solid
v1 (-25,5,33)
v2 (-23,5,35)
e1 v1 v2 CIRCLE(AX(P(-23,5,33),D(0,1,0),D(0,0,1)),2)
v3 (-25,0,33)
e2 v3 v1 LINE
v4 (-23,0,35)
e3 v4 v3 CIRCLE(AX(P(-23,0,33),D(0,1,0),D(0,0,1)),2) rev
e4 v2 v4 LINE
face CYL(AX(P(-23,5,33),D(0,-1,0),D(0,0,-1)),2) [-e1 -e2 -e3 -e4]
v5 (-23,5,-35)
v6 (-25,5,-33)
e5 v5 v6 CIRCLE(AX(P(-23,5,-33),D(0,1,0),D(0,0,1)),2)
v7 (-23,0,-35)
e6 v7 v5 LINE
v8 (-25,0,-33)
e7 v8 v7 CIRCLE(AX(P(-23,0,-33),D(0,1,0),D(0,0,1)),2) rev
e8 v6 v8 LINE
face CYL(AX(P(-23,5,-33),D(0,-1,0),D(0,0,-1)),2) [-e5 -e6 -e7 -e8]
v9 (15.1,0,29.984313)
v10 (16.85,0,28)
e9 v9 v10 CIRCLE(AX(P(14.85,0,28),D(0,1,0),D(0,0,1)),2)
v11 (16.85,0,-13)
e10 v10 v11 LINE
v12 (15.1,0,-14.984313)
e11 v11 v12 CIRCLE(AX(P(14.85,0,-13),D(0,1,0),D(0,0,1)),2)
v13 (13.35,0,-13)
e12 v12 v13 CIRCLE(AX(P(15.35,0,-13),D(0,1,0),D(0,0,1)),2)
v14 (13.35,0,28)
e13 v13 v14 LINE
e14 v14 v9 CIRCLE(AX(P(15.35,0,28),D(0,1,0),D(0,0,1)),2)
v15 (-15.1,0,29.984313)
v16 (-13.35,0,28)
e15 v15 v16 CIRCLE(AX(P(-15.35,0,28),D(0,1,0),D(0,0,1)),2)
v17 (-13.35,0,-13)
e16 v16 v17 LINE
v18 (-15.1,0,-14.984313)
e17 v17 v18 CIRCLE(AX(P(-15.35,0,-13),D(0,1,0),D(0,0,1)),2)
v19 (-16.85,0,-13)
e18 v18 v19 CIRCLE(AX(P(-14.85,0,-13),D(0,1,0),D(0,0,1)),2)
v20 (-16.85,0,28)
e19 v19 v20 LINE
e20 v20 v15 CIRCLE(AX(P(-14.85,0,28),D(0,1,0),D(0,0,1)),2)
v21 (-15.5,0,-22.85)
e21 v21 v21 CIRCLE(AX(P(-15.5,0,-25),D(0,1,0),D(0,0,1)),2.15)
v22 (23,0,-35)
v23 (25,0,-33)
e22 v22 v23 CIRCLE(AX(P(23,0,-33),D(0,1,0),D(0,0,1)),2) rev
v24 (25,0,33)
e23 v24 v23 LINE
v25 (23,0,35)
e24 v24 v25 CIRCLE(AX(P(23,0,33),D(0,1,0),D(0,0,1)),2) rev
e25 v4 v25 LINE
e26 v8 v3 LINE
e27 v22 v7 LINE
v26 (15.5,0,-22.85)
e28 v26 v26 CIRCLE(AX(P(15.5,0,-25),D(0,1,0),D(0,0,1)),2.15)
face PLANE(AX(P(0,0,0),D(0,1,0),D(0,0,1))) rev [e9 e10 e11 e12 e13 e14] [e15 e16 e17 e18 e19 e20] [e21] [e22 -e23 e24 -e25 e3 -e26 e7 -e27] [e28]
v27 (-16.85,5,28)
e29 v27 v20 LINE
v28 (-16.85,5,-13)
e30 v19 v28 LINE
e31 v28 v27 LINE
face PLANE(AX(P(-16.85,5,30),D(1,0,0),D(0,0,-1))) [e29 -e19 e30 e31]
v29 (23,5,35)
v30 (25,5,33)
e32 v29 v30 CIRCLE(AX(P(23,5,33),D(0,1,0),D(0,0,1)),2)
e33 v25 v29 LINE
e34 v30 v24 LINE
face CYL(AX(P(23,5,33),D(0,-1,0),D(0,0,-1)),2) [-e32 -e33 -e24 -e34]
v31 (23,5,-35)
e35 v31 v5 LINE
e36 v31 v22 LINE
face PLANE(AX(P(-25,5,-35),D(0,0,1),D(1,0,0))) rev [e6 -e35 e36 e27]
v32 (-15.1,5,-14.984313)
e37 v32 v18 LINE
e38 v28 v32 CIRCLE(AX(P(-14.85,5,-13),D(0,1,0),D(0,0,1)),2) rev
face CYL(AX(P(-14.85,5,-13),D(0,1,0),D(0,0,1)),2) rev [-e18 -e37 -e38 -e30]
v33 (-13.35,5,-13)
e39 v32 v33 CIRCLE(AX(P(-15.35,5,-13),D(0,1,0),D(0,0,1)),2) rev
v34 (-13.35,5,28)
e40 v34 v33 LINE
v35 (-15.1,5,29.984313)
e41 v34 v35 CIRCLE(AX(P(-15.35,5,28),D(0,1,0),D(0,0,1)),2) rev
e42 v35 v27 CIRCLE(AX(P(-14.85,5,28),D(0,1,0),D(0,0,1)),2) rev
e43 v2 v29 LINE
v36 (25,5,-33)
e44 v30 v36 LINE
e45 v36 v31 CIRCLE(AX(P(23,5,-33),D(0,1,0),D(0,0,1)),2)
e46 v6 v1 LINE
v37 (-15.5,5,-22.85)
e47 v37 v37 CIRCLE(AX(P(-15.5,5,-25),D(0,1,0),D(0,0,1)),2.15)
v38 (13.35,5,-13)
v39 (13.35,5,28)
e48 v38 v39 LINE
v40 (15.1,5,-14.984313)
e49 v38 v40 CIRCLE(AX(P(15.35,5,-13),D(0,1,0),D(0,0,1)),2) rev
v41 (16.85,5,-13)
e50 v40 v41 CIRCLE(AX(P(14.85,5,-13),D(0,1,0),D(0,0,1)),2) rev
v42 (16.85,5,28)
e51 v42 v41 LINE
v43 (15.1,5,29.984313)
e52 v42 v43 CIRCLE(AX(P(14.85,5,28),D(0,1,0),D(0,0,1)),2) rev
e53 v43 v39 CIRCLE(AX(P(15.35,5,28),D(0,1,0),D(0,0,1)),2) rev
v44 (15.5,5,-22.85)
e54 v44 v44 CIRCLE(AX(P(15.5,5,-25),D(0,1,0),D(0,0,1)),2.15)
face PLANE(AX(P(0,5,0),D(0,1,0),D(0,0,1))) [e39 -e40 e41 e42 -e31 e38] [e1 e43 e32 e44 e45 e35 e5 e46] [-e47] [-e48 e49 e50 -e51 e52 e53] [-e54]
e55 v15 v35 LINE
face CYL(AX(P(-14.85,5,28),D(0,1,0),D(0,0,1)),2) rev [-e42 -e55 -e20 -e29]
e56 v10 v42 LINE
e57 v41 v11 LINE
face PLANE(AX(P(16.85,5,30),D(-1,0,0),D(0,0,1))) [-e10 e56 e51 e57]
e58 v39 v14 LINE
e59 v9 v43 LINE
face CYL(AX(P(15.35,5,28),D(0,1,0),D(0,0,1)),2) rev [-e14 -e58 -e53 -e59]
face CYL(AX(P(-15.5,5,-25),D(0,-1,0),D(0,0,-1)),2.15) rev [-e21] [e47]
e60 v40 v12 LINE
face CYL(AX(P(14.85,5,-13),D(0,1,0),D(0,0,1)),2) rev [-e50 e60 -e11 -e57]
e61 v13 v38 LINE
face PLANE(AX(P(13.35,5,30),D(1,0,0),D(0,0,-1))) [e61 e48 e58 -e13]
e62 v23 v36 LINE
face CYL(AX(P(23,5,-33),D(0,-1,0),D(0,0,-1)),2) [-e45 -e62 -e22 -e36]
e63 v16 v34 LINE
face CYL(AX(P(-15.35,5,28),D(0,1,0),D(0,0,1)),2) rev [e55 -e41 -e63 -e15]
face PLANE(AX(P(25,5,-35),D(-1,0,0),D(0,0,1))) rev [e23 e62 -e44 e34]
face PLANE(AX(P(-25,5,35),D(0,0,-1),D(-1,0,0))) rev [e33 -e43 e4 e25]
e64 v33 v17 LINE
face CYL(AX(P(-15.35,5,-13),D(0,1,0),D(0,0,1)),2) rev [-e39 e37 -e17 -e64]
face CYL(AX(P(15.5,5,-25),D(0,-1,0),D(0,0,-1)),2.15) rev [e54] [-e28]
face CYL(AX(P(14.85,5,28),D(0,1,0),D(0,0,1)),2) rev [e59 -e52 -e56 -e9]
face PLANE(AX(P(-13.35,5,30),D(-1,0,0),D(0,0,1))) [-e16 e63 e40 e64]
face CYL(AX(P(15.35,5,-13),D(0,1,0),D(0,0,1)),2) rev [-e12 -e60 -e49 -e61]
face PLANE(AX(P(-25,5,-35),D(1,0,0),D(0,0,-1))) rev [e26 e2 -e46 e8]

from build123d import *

# Parameters (mm, degrees)
SKETCH_1_W      = 50
SKETCH_1_H      = 70
SKETCH_1_R      = 2.15
SKETCH_1_W_2    = 3.5
SKETCH_1_H_2    = 45
EXTRUDE_1_DEPTH = 5
FILLET_1_R      = 2
FILLET_2_R      = 2


with BuildPart() as part:
    # 草圖1 → 填料-伸長1 (new body)
    with BuildSketch(Plane(origin=(0, 0, 0), x_dir=(1, 0, 0), z_dir=(0, 1, 0))):
        Rectangle(SKETCH_1_W, SKETCH_1_H)
        with Locations(Location((-15.5, 25, 0), (0, 0, 270))):
            Circle(SKETCH_1_R, mode=Mode.SUBTRACT)
        with Locations(Location((15.5, 25, 0), (0, 0, 270))):
            Circle(SKETCH_1_R, mode=Mode.SUBTRACT)
        with Locations((-15.1, -7.5)):
            Rectangle(SKETCH_1_W_2, SKETCH_1_H_2, mode=Mode.SUBTRACT)
        with Locations((15.1, -7.5)):
            Rectangle(SKETCH_1_W_2, SKETCH_1_H_2, mode=Mode.SUBTRACT)
    extrude(amount=EXTRUDE_1_DEPTH)

    # 圓角1
    # the kernel refuses this fillet: 2 mm, written as the material it adds along each edge
    with BuildSketch(Plane(origin=(16.85, 0, 30), x_dir=(0, 0, -1), z_dir=(0, 1, 0)), Plane(origin=(-13.35, 0, 30), x_dir=(0, 0, -1), z_dir=(0, 1, 0))) as fillet_1_piece_1:
        with BuildLine():
            CenterArc((FILLET_1_R, FILLET_1_R), FILLET_1_R, 180, 90)
            Line((0, FILLET_1_R), (0, 0))
            Line((0, 0), (FILLET_1_R, 0))
        make_face()
    extrude(amount=5)
    with BuildSketch(Plane(origin=(13.35, 0, 30), x_dir=(0, 0, -1), z_dir=(0, 1, 0)), Plane(origin=(-16.85, 0, 30), x_dir=(0, 0, -1), z_dir=(0, 1, 0)), Plane(origin=(16.85, 0, -15), x_dir=(0, 0, 1), z_dir=(0, 1, 0)), Plane(origin=(13.35, 0, -15), x_dir=(1, 0, 0), z_dir=(0, 1, 0)), Plane(origin=(-13.35, 0, -15), x_dir=(0, 0, 1), z_dir=(0, 1, 0)), Plane(origin=(-16.85, 0, -15), x_dir=(1, 0, 0), z_dir=(0, 1, 0))) as fillet_1_piece_2:
        with BuildLine():
            CenterArc((FILLET_1_R, -FILLET_1_R), FILLET_1_R, 90, 90)
            Line((0, -FILLET_1_R), (0, 0))
            Line((0, 0), (FILLET_1_R, 0))
        make_face()
    extrude(amount=5)

    # 圓角2
    fillet_2_edges = [part.edges().sort_by_distance(p)[0] for p in [
        (25, 2.5, 35),
        (-25, 2.5, 35),
        (-25, 2.5, -35),
        (25, 2.5, -35),
    ]]
    fillet(fillet_2_edges, radius=FILLET_2_R)


solid = part.part
